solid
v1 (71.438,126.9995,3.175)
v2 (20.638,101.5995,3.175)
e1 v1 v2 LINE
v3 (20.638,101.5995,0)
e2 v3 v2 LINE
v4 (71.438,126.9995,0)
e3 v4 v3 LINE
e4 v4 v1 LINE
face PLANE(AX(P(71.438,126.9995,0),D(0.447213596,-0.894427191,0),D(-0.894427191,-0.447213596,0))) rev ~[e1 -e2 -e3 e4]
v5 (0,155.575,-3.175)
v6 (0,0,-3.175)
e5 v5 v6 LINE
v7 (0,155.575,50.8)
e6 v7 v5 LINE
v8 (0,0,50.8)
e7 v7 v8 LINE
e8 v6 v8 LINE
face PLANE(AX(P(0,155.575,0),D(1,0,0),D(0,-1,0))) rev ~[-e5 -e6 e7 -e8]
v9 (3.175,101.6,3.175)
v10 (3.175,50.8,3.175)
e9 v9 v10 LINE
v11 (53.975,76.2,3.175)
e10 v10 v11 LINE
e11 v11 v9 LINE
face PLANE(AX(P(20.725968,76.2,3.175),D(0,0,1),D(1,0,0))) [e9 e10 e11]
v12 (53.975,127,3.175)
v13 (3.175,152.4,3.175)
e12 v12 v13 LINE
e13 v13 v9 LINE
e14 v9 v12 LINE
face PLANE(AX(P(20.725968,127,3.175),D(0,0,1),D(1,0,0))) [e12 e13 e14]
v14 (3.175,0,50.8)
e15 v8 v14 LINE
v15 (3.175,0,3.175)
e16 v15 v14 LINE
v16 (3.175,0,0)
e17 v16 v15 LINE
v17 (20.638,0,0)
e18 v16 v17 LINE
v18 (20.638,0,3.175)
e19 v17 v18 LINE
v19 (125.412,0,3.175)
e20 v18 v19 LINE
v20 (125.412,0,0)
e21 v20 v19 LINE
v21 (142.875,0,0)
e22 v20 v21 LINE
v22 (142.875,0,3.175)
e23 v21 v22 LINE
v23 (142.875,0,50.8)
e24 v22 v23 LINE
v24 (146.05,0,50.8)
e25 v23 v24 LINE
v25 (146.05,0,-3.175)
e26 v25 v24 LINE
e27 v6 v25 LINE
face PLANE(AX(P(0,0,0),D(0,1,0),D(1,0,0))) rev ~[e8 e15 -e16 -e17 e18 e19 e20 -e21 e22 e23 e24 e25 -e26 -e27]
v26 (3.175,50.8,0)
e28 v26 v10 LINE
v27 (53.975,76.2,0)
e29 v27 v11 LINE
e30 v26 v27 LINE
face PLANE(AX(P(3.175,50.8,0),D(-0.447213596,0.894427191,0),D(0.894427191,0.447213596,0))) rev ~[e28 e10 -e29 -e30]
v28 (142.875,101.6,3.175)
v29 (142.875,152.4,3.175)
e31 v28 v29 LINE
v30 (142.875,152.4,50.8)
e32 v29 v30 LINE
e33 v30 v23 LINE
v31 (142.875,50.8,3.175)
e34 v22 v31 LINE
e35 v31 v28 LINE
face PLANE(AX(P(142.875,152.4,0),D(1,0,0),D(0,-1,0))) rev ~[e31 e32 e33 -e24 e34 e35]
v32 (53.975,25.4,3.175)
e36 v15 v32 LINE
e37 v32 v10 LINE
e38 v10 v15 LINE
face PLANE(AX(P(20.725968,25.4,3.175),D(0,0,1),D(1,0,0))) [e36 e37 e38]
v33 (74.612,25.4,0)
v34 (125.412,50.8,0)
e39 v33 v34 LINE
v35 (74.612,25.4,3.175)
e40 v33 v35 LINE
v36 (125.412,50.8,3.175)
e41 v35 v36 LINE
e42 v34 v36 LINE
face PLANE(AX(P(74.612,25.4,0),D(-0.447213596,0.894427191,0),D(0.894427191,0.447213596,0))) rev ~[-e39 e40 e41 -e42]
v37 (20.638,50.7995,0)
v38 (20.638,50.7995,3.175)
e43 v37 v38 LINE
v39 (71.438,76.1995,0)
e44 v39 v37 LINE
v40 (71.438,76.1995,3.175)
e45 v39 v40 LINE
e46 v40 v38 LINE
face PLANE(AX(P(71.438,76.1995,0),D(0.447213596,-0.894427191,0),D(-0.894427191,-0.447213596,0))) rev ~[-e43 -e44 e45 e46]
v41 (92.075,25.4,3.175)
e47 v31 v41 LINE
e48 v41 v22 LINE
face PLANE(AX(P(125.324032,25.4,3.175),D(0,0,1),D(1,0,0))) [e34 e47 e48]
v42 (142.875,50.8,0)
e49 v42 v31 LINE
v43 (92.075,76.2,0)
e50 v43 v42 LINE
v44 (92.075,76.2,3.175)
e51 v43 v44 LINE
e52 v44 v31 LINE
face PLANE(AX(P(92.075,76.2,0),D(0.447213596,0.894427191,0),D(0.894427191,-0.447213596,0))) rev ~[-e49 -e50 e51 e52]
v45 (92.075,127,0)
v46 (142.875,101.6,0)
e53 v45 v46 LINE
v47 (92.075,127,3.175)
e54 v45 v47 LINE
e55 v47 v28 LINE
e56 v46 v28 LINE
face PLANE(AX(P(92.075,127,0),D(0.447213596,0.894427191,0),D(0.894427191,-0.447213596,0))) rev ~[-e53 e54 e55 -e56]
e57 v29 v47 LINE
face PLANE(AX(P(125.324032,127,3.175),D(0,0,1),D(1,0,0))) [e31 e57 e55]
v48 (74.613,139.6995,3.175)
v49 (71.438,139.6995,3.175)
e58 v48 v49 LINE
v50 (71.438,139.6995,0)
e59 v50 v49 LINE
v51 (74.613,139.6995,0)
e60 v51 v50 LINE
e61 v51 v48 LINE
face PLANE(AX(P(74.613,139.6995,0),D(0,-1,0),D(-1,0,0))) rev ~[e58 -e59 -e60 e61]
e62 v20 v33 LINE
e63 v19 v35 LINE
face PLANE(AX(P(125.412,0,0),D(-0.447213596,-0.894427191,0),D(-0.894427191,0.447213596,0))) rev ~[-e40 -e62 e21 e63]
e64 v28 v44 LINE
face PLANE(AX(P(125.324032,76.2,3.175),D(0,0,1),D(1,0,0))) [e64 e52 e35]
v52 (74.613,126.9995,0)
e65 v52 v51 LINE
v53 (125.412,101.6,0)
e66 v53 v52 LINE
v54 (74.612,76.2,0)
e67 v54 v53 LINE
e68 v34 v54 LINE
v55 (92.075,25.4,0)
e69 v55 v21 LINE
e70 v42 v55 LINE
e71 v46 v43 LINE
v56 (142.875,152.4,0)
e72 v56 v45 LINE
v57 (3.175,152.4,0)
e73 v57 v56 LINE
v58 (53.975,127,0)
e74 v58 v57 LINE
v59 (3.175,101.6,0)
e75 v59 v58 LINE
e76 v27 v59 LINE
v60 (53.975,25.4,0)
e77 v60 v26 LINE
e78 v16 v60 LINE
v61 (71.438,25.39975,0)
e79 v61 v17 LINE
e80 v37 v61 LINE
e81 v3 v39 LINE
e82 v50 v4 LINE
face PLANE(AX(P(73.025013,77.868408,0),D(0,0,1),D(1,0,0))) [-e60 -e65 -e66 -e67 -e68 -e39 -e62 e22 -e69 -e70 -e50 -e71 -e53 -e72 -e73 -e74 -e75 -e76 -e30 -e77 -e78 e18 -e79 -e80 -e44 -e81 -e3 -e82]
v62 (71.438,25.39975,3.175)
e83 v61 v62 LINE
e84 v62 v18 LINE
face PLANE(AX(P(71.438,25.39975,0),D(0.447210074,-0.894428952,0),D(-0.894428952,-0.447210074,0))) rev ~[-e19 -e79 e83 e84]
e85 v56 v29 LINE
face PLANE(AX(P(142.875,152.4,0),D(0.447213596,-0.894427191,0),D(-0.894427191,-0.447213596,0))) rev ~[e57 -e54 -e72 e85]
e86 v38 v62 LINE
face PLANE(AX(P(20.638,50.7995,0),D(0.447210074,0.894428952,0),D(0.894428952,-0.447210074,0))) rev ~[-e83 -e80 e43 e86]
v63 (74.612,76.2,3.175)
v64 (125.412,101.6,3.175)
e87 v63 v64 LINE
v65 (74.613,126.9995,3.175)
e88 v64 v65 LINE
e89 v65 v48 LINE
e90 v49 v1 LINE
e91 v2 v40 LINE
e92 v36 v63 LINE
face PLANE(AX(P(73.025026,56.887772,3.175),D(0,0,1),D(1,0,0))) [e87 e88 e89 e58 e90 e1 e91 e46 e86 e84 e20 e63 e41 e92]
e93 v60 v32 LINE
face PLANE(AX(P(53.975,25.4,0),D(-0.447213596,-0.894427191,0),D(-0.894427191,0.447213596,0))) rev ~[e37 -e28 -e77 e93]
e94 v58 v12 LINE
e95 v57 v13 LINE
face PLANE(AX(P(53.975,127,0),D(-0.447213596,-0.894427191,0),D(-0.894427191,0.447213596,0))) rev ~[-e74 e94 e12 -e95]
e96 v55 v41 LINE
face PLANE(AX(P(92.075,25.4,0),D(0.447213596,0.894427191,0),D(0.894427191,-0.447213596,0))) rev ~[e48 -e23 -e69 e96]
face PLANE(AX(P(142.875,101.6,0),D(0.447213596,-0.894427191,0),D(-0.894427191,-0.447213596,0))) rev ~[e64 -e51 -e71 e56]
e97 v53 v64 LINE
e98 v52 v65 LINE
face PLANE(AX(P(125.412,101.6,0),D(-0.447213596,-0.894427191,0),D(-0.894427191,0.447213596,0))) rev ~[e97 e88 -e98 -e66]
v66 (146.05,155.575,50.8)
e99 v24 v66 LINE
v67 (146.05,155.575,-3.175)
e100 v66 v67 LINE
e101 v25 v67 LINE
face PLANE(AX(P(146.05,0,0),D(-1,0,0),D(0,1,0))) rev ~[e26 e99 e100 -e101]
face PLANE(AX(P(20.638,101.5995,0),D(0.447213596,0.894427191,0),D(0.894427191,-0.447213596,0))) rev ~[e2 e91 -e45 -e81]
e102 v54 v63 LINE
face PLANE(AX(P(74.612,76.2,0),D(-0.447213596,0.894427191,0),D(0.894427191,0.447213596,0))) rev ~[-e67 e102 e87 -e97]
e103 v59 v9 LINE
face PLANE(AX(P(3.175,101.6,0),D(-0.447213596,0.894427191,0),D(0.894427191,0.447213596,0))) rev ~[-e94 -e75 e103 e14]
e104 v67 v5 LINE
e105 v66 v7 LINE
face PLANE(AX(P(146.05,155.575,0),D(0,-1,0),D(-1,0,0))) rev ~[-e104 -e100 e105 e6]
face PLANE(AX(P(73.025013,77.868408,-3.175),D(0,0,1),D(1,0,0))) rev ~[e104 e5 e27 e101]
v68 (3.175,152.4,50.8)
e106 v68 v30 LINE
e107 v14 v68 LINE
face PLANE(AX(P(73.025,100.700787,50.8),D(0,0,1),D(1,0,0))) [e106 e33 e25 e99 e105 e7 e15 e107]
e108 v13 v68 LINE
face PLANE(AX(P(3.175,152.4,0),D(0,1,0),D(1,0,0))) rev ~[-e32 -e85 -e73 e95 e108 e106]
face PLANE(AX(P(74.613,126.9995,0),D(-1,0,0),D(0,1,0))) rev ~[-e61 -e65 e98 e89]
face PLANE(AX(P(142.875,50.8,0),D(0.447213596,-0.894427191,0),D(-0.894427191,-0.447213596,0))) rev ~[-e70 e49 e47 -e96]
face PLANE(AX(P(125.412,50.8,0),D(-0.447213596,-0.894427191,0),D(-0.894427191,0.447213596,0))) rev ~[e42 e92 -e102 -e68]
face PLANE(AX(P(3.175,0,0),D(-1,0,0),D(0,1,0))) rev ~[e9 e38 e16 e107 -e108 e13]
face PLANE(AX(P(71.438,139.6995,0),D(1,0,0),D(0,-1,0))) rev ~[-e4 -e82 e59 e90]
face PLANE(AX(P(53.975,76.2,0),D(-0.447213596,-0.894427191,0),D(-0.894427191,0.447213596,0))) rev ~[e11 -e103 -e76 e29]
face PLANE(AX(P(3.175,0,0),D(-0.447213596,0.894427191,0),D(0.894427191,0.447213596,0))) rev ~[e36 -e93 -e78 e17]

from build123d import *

# Parameters (mm, degrees)
F1_DEPTH = 3.175
F2_DEPTH = 50.8
F3_DEPTH = 3.175


# Not quite as in the source:
# - a length typed as a fraction of an inch, garbled in the dataset ("3 / 203.2 mm" for 3/8 in), is restored


with BuildPart() as f1:
    # F0 (on Top) → F1 (new body)
    with BuildSketch(Plane.XY):
        Polygon((53.975, 25.4), (3.175, 0), (20.638, 0), (71.438, 25.39975), (20.638, 50.7995), (71.438, 76.1995), (20.638, 101.5995), (71.438, 126.9995), (71.438, 139.6995), (74.613, 139.6995), (74.613, 126.9995), (125.412, 101.6), (74.612, 76.2), (125.412, 50.8), (74.612, 25.4), (125.412, 0), (142.875, 0), (92.075, 25.4), (142.875, 50.8), (92.075, 76.2), (142.875, 101.6), (92.075, 127), (142.875, 152.4), (3.175, 152.4), (53.975, 127), (3.175, 101.6), (53.975, 76.2), (3.175, 50.8), align=None)
        Polygon((142.875, 101.6), (142.875, 152.4), (92.075, 127), align=None)
        Polygon((0, 155.575), (0, 0), (3.175, 0), (3.175, 50.8), (3.175, 101.6), (3.175, 152.4), (142.875, 152.4), (142.875, 101.6), (142.875, 50.8), (142.875, 0), (146.05, 0), (146.05, 155.575), align=None)
        Polygon((92.075, 76.2), (142.875, 50.8), (142.875, 101.6), align=None)
        Polygon((92.075, 25.4), (142.875, 0), (142.875, 50.8), align=None)
        Polygon((71.438, 25.39975), (20.638, 0), (125.412, 0), (74.612, 25.4), (125.412, 50.8), (74.612, 76.2), (125.412, 101.6), (74.613, 126.9995), (74.613, 139.6995), (71.438, 139.6995), (71.438, 126.9995), (20.638, 101.5995), (71.438, 76.1995), (20.638, 50.7995), align=None)
        Polygon((3.175, 50.8), (3.175, 0), (53.975, 25.4), align=None)
        Polygon((3.175, 101.6), (3.175, 50.8), (53.975, 76.2), align=None)
        Polygon((3.175, 152.4), (3.175, 101.6), (53.975, 127), align=None)
    extrude(amount=-F1_DEPTH)

    # F0 (on Top) → F2 (join)
    with BuildSketch(Plane.XY):
        Polygon((0, 155.575), (0, 0), (3.175, 0), (3.175, 50.8), (3.175, 101.6), (3.175, 152.4), (142.875, 152.4), (142.875, 101.6), (142.875, 50.8), (142.875, 0), (146.05, 0), (146.05, 155.575), align=None)
    extrude(amount=F2_DEPTH)

    # F0 (on Top) → F3 (join)
    with BuildSketch(Plane.XY):
        Polygon((3.175, 152.4), (3.175, 101.6), (53.975, 127), align=None)
        Polygon((3.175, 101.6), (3.175, 50.8), (53.975, 76.2), align=None)
        Polygon((3.175, 50.8), (3.175, 0), (53.975, 25.4), align=None)
        Polygon((92.075, 25.4), (142.875, 0), (142.875, 50.8), align=None)
        Polygon((92.075, 76.2), (142.875, 50.8), (142.875, 101.6), align=None)
        Polygon((142.875, 101.6), (142.875, 152.4), (92.075, 127), align=None)
        Polygon((71.438, 25.39975), (20.638, 0), (125.412, 0), (74.612, 25.4), (125.412, 50.8), (74.612, 76.2), (125.412, 101.6), (74.613, 126.9995), (74.613, 139.6995), (71.438, 139.6995), (71.438, 126.9995), (20.638, 101.5995), (71.438, 76.1995), (20.638, 50.7995), align=None)
    extrude(amount=F3_DEPTH)


solid = f1.part
